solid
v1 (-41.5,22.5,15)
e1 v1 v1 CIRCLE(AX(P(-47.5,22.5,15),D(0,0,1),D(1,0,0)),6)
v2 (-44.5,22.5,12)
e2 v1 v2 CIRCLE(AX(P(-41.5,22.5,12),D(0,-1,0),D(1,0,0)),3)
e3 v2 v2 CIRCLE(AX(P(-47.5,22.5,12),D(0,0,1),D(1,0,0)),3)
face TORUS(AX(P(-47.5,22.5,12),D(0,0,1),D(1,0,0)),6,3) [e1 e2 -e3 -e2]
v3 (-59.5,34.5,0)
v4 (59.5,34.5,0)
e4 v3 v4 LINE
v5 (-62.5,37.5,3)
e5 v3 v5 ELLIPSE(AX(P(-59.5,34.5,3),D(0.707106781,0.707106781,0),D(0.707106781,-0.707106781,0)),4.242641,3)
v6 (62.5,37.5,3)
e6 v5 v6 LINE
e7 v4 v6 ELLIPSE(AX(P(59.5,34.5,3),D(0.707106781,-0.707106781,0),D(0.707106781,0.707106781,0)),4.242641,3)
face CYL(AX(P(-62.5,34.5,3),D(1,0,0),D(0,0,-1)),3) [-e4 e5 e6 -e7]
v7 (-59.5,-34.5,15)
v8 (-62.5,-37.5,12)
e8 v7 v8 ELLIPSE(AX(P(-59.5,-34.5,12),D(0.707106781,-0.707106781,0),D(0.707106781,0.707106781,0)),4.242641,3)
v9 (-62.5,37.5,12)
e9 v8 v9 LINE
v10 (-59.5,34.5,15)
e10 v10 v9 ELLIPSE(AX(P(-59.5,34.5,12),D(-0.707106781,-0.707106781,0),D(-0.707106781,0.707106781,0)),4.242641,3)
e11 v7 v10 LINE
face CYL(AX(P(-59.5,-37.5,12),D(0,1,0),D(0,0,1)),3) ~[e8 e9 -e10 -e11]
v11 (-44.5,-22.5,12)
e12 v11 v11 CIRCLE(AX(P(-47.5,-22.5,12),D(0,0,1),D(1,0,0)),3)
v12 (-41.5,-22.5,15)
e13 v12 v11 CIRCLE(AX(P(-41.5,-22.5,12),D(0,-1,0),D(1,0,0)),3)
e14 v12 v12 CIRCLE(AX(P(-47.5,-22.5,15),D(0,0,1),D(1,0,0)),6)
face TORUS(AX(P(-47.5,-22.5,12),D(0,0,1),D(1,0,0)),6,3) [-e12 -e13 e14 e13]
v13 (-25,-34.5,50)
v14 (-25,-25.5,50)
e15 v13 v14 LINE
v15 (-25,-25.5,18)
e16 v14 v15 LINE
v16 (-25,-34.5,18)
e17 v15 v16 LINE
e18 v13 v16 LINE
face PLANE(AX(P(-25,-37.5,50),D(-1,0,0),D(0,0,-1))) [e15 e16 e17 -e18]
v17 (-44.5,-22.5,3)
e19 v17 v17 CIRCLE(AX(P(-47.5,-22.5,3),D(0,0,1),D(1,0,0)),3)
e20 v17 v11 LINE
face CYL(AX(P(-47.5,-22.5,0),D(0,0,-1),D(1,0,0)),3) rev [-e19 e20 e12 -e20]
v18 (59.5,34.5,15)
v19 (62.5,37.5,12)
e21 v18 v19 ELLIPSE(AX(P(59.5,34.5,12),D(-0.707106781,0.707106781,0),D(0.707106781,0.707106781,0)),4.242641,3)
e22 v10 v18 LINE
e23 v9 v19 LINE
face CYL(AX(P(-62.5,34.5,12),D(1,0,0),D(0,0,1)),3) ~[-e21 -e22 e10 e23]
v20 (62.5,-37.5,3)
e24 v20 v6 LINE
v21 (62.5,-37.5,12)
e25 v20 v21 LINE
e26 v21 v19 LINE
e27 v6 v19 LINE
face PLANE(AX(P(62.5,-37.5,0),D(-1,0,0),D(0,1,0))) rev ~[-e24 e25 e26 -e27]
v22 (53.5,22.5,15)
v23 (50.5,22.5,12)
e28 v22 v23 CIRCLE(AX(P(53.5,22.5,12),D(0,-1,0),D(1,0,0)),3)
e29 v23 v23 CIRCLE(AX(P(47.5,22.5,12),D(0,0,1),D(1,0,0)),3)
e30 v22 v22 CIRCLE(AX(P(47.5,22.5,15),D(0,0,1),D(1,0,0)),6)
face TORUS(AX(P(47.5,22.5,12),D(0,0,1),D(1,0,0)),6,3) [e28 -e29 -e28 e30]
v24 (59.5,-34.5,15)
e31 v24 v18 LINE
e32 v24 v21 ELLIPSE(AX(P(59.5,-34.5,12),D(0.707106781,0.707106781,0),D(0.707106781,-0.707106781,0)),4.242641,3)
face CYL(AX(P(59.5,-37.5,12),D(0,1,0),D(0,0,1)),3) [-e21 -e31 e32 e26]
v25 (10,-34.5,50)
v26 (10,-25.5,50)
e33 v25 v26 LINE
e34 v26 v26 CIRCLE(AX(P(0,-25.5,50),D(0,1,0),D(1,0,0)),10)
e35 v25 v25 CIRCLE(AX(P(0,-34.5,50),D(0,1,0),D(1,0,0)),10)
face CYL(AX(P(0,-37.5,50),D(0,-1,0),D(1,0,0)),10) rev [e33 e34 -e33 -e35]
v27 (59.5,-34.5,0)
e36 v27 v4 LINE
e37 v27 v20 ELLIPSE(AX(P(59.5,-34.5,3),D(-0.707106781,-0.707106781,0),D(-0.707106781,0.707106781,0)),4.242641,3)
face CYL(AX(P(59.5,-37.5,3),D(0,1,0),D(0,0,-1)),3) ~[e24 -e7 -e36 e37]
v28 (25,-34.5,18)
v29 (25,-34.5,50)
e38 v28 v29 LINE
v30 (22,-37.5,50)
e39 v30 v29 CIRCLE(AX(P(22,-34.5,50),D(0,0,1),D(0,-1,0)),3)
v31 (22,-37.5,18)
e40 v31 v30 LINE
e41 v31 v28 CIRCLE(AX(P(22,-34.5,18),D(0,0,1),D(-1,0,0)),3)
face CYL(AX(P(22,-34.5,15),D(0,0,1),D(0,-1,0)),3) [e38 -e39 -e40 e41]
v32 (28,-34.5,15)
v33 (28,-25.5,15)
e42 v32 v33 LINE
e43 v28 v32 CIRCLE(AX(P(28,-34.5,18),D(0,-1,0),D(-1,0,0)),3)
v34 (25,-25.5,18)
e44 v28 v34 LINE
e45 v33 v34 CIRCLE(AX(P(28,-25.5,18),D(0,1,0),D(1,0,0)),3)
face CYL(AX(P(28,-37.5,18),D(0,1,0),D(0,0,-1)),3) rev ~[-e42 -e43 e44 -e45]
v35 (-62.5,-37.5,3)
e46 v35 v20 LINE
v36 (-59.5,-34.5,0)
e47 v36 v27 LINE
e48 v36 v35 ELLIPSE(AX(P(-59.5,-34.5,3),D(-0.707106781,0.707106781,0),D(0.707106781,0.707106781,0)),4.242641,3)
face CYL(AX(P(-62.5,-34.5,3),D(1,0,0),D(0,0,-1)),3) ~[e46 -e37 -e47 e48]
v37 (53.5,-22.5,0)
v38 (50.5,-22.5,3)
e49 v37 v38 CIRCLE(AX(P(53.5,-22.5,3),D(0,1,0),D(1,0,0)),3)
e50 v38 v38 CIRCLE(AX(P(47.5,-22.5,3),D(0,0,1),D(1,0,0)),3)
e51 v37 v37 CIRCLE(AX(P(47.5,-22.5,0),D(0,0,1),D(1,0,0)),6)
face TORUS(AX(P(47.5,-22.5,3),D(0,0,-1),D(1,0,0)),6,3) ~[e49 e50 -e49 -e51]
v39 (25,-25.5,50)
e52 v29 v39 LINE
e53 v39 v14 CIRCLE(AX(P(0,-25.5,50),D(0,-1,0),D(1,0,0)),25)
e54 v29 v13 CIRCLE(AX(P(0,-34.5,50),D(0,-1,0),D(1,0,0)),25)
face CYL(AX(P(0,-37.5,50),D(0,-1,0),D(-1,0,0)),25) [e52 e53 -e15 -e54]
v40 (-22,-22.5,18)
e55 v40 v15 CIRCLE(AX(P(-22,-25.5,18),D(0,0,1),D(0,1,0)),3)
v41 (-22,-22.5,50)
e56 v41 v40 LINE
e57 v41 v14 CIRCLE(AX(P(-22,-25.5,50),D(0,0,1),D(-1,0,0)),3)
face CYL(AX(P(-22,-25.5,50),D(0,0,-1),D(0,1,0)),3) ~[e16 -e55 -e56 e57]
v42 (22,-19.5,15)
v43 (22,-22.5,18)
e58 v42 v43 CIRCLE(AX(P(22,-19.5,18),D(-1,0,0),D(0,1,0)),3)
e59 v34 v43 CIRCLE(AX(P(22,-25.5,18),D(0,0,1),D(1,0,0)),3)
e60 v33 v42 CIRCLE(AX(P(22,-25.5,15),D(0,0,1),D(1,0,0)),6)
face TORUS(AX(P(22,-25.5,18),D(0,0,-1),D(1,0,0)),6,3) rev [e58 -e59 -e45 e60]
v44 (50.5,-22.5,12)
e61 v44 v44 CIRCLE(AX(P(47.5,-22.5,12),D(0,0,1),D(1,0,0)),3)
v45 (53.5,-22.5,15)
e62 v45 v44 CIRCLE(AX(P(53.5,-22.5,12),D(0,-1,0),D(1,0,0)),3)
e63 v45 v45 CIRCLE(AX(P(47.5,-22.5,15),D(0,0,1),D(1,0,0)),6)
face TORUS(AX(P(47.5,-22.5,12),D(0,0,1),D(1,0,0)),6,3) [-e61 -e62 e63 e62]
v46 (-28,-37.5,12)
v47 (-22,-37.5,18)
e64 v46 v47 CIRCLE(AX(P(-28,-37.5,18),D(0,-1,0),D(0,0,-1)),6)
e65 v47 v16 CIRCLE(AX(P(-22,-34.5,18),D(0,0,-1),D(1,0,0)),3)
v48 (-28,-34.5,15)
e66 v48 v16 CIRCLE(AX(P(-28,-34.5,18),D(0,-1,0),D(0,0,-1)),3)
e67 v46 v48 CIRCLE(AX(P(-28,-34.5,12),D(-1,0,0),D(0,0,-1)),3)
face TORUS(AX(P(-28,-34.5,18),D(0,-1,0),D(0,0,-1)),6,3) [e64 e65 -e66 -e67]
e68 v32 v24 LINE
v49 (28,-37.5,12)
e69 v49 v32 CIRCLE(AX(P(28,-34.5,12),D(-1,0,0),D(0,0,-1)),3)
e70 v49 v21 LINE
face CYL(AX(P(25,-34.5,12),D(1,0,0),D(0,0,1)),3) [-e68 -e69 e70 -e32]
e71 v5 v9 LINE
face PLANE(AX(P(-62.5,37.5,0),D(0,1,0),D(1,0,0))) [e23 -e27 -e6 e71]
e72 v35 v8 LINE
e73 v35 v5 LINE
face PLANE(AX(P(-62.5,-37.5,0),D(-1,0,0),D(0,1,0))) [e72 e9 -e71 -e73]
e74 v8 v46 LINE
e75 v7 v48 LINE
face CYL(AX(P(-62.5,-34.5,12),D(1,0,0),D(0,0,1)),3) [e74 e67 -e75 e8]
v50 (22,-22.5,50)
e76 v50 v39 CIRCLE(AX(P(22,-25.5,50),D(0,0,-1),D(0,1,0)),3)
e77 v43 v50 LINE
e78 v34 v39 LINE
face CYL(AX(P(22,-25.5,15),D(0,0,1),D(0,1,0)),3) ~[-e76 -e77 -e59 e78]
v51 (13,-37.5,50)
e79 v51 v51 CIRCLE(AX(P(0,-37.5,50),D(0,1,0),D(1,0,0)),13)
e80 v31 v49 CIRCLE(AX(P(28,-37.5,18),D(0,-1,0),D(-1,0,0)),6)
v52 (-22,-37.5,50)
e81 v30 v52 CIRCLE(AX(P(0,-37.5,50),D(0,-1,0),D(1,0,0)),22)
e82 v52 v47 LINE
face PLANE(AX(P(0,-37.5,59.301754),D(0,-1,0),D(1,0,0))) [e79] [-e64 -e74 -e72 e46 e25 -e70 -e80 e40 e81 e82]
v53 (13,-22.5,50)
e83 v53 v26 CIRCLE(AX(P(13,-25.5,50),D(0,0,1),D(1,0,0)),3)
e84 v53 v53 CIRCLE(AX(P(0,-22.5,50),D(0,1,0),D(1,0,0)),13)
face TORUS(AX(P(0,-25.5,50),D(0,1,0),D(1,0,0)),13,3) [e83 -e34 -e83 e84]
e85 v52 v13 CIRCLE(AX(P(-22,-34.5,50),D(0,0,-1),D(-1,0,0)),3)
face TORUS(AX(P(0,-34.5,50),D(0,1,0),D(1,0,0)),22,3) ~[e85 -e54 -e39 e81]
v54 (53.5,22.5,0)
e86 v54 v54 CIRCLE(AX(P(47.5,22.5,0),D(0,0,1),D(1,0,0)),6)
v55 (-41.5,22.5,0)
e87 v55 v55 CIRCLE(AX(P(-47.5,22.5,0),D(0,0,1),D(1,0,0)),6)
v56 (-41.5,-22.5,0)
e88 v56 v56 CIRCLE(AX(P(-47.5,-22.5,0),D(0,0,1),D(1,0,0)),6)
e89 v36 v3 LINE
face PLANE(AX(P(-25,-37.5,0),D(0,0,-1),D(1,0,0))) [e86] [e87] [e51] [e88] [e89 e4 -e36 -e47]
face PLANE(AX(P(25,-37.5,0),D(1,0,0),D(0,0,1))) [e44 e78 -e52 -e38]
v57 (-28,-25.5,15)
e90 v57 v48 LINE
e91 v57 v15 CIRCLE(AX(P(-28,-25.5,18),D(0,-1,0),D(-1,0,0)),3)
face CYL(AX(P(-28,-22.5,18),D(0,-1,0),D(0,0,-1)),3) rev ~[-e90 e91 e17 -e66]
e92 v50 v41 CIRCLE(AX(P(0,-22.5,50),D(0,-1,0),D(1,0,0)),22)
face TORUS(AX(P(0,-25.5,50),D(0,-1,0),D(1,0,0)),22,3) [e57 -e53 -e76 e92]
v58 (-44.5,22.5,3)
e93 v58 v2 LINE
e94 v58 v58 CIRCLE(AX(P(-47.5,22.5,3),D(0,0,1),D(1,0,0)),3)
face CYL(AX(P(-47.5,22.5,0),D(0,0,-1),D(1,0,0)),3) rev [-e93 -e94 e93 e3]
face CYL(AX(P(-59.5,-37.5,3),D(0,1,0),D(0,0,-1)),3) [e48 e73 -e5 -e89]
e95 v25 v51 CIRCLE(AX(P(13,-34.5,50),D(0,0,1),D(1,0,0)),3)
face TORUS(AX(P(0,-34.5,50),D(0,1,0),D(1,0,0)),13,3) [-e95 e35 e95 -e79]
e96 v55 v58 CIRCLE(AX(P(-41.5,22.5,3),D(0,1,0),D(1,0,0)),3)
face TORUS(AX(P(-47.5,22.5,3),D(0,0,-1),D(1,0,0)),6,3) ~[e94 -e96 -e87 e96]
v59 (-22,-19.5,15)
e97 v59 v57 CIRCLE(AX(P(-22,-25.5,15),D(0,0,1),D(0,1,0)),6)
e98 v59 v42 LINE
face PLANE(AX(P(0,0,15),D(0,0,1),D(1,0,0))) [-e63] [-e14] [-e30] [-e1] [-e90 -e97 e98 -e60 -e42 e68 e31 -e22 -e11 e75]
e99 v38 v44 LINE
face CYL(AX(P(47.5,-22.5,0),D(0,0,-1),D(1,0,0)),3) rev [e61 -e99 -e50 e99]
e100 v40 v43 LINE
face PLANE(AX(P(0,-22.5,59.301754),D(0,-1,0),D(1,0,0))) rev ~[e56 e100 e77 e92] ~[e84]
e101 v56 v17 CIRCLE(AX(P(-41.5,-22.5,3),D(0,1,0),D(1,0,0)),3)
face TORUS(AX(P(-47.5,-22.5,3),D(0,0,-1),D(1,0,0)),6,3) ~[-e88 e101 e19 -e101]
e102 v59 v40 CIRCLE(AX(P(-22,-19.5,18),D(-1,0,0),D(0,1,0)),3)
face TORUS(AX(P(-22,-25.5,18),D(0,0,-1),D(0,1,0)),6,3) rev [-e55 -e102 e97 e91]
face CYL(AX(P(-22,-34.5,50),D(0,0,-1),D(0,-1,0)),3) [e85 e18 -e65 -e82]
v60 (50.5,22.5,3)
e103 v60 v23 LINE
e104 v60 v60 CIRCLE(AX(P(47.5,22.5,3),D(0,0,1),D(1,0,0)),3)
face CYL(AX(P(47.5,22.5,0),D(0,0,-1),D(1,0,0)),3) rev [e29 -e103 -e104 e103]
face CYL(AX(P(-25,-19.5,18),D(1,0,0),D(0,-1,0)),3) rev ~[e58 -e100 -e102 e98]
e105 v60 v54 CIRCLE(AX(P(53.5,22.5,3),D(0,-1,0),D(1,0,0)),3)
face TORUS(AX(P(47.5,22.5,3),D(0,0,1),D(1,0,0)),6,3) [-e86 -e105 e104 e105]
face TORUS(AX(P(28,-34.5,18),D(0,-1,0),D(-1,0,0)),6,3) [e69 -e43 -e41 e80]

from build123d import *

# Parameters (mm, degrees)
F0_W     = 125
F0_H     = 75
F0_R     = 3
F1_DEPTH = 15
F2_W     = 50
F2_H     = 15
F3_DEPTH = 15
F4_R     = 3


with BuildPart() as f1:
    # F0 (on Top) → F1 (new body)
    with BuildSketch(Plane.XY):
        Rectangle(F0_W, F0_H)
        with Locations((-47.5, -22.5)):
            Circle(F0_R, mode=Mode.SUBTRACT)
        with Locations((47.5, -22.5)):
            Circle(F0_R, mode=Mode.SUBTRACT)
        with Locations((-47.5, 22.5)):
            Circle(F0_R, mode=Mode.SUBTRACT)
        with Locations((47.5, 22.5)):
            Circle(F0_R, mode=Mode.SUBTRACT)
    extrude(amount=F1_DEPTH)

    # F2 (on face) → F3 (join)
    with BuildSketch(Plane.XZ.offset(37.5)):
        with BuildLine():
            Line((10, 50), (25, 50))
            ThreePointArc((25, 50), (0, 75), (-25, 50))
            Line((-25, 50), (-10, 50))
            ThreePointArc((-10, 50), (0, 60), (10, 50))
        make_face()
        with BuildLine():
            ThreePointArc((-25, 50), (0, 25), (25, 50))
            Line((25, 50), (10, 50))
            ThreePointArc((10, 50), (0, 40), (-10, 50))
            Line((-10, 50), (-25, 50))
        make_face()
        with BuildLine():
            Line((25, 15), (25, 50))
            ThreePointArc((25, 50), (0, 25), (-25, 50))
            Line((-25, 50), (-25, 15))
            Line((-25, 15), (25, 15))
        make_face()
        with Locations((0, 7.5)):
            Rectangle(F2_W, F2_H)
    extrude(amount=-F3_DEPTH)

    # F4
    f4_edges = [f1.edges().sort_by_distance(p)[0] for p in [
        (43.75, -37.5, 15),
        (25, -30, 15),
        (0, -22.5, 15),
        (-25, -30, 15),
        (-43.75, -37.5, 15),
        (-62.5, 0, 15),
        (0, 37.5, 15),
        (62.5, 0, 15),
        (-50.5, -22.5, 15),
        (44.5, -22.5, 15),
        (-50.5, 22.5, 15),
        (44.5, 22.5, 15),
        (10, -30, 50),
        (-10, -37.5, 50),
        (-10, -22.5, 50),
        (25, -22.5, 32.5),
        (0, -22.5, 75),
        (62.5, 0, 0),
        (0, 37.5, 0),
        (-62.5, 0, 0),
        (0, -37.5, 0),
        (-50.5, -22.5, 0),
        (44.5, -22.5, 0),
        (-50.5, 22.5, 0),
        (44.5, 22.5, 0),
        (-25, -37.5, 32.5),
        (-25, -22.5, 32.5),
        (0, -37.5, 75),
        (25, -37.5, 32.5),
    ]]
    fillet(f4_edges, radius=F4_R)


solid = f1.part
